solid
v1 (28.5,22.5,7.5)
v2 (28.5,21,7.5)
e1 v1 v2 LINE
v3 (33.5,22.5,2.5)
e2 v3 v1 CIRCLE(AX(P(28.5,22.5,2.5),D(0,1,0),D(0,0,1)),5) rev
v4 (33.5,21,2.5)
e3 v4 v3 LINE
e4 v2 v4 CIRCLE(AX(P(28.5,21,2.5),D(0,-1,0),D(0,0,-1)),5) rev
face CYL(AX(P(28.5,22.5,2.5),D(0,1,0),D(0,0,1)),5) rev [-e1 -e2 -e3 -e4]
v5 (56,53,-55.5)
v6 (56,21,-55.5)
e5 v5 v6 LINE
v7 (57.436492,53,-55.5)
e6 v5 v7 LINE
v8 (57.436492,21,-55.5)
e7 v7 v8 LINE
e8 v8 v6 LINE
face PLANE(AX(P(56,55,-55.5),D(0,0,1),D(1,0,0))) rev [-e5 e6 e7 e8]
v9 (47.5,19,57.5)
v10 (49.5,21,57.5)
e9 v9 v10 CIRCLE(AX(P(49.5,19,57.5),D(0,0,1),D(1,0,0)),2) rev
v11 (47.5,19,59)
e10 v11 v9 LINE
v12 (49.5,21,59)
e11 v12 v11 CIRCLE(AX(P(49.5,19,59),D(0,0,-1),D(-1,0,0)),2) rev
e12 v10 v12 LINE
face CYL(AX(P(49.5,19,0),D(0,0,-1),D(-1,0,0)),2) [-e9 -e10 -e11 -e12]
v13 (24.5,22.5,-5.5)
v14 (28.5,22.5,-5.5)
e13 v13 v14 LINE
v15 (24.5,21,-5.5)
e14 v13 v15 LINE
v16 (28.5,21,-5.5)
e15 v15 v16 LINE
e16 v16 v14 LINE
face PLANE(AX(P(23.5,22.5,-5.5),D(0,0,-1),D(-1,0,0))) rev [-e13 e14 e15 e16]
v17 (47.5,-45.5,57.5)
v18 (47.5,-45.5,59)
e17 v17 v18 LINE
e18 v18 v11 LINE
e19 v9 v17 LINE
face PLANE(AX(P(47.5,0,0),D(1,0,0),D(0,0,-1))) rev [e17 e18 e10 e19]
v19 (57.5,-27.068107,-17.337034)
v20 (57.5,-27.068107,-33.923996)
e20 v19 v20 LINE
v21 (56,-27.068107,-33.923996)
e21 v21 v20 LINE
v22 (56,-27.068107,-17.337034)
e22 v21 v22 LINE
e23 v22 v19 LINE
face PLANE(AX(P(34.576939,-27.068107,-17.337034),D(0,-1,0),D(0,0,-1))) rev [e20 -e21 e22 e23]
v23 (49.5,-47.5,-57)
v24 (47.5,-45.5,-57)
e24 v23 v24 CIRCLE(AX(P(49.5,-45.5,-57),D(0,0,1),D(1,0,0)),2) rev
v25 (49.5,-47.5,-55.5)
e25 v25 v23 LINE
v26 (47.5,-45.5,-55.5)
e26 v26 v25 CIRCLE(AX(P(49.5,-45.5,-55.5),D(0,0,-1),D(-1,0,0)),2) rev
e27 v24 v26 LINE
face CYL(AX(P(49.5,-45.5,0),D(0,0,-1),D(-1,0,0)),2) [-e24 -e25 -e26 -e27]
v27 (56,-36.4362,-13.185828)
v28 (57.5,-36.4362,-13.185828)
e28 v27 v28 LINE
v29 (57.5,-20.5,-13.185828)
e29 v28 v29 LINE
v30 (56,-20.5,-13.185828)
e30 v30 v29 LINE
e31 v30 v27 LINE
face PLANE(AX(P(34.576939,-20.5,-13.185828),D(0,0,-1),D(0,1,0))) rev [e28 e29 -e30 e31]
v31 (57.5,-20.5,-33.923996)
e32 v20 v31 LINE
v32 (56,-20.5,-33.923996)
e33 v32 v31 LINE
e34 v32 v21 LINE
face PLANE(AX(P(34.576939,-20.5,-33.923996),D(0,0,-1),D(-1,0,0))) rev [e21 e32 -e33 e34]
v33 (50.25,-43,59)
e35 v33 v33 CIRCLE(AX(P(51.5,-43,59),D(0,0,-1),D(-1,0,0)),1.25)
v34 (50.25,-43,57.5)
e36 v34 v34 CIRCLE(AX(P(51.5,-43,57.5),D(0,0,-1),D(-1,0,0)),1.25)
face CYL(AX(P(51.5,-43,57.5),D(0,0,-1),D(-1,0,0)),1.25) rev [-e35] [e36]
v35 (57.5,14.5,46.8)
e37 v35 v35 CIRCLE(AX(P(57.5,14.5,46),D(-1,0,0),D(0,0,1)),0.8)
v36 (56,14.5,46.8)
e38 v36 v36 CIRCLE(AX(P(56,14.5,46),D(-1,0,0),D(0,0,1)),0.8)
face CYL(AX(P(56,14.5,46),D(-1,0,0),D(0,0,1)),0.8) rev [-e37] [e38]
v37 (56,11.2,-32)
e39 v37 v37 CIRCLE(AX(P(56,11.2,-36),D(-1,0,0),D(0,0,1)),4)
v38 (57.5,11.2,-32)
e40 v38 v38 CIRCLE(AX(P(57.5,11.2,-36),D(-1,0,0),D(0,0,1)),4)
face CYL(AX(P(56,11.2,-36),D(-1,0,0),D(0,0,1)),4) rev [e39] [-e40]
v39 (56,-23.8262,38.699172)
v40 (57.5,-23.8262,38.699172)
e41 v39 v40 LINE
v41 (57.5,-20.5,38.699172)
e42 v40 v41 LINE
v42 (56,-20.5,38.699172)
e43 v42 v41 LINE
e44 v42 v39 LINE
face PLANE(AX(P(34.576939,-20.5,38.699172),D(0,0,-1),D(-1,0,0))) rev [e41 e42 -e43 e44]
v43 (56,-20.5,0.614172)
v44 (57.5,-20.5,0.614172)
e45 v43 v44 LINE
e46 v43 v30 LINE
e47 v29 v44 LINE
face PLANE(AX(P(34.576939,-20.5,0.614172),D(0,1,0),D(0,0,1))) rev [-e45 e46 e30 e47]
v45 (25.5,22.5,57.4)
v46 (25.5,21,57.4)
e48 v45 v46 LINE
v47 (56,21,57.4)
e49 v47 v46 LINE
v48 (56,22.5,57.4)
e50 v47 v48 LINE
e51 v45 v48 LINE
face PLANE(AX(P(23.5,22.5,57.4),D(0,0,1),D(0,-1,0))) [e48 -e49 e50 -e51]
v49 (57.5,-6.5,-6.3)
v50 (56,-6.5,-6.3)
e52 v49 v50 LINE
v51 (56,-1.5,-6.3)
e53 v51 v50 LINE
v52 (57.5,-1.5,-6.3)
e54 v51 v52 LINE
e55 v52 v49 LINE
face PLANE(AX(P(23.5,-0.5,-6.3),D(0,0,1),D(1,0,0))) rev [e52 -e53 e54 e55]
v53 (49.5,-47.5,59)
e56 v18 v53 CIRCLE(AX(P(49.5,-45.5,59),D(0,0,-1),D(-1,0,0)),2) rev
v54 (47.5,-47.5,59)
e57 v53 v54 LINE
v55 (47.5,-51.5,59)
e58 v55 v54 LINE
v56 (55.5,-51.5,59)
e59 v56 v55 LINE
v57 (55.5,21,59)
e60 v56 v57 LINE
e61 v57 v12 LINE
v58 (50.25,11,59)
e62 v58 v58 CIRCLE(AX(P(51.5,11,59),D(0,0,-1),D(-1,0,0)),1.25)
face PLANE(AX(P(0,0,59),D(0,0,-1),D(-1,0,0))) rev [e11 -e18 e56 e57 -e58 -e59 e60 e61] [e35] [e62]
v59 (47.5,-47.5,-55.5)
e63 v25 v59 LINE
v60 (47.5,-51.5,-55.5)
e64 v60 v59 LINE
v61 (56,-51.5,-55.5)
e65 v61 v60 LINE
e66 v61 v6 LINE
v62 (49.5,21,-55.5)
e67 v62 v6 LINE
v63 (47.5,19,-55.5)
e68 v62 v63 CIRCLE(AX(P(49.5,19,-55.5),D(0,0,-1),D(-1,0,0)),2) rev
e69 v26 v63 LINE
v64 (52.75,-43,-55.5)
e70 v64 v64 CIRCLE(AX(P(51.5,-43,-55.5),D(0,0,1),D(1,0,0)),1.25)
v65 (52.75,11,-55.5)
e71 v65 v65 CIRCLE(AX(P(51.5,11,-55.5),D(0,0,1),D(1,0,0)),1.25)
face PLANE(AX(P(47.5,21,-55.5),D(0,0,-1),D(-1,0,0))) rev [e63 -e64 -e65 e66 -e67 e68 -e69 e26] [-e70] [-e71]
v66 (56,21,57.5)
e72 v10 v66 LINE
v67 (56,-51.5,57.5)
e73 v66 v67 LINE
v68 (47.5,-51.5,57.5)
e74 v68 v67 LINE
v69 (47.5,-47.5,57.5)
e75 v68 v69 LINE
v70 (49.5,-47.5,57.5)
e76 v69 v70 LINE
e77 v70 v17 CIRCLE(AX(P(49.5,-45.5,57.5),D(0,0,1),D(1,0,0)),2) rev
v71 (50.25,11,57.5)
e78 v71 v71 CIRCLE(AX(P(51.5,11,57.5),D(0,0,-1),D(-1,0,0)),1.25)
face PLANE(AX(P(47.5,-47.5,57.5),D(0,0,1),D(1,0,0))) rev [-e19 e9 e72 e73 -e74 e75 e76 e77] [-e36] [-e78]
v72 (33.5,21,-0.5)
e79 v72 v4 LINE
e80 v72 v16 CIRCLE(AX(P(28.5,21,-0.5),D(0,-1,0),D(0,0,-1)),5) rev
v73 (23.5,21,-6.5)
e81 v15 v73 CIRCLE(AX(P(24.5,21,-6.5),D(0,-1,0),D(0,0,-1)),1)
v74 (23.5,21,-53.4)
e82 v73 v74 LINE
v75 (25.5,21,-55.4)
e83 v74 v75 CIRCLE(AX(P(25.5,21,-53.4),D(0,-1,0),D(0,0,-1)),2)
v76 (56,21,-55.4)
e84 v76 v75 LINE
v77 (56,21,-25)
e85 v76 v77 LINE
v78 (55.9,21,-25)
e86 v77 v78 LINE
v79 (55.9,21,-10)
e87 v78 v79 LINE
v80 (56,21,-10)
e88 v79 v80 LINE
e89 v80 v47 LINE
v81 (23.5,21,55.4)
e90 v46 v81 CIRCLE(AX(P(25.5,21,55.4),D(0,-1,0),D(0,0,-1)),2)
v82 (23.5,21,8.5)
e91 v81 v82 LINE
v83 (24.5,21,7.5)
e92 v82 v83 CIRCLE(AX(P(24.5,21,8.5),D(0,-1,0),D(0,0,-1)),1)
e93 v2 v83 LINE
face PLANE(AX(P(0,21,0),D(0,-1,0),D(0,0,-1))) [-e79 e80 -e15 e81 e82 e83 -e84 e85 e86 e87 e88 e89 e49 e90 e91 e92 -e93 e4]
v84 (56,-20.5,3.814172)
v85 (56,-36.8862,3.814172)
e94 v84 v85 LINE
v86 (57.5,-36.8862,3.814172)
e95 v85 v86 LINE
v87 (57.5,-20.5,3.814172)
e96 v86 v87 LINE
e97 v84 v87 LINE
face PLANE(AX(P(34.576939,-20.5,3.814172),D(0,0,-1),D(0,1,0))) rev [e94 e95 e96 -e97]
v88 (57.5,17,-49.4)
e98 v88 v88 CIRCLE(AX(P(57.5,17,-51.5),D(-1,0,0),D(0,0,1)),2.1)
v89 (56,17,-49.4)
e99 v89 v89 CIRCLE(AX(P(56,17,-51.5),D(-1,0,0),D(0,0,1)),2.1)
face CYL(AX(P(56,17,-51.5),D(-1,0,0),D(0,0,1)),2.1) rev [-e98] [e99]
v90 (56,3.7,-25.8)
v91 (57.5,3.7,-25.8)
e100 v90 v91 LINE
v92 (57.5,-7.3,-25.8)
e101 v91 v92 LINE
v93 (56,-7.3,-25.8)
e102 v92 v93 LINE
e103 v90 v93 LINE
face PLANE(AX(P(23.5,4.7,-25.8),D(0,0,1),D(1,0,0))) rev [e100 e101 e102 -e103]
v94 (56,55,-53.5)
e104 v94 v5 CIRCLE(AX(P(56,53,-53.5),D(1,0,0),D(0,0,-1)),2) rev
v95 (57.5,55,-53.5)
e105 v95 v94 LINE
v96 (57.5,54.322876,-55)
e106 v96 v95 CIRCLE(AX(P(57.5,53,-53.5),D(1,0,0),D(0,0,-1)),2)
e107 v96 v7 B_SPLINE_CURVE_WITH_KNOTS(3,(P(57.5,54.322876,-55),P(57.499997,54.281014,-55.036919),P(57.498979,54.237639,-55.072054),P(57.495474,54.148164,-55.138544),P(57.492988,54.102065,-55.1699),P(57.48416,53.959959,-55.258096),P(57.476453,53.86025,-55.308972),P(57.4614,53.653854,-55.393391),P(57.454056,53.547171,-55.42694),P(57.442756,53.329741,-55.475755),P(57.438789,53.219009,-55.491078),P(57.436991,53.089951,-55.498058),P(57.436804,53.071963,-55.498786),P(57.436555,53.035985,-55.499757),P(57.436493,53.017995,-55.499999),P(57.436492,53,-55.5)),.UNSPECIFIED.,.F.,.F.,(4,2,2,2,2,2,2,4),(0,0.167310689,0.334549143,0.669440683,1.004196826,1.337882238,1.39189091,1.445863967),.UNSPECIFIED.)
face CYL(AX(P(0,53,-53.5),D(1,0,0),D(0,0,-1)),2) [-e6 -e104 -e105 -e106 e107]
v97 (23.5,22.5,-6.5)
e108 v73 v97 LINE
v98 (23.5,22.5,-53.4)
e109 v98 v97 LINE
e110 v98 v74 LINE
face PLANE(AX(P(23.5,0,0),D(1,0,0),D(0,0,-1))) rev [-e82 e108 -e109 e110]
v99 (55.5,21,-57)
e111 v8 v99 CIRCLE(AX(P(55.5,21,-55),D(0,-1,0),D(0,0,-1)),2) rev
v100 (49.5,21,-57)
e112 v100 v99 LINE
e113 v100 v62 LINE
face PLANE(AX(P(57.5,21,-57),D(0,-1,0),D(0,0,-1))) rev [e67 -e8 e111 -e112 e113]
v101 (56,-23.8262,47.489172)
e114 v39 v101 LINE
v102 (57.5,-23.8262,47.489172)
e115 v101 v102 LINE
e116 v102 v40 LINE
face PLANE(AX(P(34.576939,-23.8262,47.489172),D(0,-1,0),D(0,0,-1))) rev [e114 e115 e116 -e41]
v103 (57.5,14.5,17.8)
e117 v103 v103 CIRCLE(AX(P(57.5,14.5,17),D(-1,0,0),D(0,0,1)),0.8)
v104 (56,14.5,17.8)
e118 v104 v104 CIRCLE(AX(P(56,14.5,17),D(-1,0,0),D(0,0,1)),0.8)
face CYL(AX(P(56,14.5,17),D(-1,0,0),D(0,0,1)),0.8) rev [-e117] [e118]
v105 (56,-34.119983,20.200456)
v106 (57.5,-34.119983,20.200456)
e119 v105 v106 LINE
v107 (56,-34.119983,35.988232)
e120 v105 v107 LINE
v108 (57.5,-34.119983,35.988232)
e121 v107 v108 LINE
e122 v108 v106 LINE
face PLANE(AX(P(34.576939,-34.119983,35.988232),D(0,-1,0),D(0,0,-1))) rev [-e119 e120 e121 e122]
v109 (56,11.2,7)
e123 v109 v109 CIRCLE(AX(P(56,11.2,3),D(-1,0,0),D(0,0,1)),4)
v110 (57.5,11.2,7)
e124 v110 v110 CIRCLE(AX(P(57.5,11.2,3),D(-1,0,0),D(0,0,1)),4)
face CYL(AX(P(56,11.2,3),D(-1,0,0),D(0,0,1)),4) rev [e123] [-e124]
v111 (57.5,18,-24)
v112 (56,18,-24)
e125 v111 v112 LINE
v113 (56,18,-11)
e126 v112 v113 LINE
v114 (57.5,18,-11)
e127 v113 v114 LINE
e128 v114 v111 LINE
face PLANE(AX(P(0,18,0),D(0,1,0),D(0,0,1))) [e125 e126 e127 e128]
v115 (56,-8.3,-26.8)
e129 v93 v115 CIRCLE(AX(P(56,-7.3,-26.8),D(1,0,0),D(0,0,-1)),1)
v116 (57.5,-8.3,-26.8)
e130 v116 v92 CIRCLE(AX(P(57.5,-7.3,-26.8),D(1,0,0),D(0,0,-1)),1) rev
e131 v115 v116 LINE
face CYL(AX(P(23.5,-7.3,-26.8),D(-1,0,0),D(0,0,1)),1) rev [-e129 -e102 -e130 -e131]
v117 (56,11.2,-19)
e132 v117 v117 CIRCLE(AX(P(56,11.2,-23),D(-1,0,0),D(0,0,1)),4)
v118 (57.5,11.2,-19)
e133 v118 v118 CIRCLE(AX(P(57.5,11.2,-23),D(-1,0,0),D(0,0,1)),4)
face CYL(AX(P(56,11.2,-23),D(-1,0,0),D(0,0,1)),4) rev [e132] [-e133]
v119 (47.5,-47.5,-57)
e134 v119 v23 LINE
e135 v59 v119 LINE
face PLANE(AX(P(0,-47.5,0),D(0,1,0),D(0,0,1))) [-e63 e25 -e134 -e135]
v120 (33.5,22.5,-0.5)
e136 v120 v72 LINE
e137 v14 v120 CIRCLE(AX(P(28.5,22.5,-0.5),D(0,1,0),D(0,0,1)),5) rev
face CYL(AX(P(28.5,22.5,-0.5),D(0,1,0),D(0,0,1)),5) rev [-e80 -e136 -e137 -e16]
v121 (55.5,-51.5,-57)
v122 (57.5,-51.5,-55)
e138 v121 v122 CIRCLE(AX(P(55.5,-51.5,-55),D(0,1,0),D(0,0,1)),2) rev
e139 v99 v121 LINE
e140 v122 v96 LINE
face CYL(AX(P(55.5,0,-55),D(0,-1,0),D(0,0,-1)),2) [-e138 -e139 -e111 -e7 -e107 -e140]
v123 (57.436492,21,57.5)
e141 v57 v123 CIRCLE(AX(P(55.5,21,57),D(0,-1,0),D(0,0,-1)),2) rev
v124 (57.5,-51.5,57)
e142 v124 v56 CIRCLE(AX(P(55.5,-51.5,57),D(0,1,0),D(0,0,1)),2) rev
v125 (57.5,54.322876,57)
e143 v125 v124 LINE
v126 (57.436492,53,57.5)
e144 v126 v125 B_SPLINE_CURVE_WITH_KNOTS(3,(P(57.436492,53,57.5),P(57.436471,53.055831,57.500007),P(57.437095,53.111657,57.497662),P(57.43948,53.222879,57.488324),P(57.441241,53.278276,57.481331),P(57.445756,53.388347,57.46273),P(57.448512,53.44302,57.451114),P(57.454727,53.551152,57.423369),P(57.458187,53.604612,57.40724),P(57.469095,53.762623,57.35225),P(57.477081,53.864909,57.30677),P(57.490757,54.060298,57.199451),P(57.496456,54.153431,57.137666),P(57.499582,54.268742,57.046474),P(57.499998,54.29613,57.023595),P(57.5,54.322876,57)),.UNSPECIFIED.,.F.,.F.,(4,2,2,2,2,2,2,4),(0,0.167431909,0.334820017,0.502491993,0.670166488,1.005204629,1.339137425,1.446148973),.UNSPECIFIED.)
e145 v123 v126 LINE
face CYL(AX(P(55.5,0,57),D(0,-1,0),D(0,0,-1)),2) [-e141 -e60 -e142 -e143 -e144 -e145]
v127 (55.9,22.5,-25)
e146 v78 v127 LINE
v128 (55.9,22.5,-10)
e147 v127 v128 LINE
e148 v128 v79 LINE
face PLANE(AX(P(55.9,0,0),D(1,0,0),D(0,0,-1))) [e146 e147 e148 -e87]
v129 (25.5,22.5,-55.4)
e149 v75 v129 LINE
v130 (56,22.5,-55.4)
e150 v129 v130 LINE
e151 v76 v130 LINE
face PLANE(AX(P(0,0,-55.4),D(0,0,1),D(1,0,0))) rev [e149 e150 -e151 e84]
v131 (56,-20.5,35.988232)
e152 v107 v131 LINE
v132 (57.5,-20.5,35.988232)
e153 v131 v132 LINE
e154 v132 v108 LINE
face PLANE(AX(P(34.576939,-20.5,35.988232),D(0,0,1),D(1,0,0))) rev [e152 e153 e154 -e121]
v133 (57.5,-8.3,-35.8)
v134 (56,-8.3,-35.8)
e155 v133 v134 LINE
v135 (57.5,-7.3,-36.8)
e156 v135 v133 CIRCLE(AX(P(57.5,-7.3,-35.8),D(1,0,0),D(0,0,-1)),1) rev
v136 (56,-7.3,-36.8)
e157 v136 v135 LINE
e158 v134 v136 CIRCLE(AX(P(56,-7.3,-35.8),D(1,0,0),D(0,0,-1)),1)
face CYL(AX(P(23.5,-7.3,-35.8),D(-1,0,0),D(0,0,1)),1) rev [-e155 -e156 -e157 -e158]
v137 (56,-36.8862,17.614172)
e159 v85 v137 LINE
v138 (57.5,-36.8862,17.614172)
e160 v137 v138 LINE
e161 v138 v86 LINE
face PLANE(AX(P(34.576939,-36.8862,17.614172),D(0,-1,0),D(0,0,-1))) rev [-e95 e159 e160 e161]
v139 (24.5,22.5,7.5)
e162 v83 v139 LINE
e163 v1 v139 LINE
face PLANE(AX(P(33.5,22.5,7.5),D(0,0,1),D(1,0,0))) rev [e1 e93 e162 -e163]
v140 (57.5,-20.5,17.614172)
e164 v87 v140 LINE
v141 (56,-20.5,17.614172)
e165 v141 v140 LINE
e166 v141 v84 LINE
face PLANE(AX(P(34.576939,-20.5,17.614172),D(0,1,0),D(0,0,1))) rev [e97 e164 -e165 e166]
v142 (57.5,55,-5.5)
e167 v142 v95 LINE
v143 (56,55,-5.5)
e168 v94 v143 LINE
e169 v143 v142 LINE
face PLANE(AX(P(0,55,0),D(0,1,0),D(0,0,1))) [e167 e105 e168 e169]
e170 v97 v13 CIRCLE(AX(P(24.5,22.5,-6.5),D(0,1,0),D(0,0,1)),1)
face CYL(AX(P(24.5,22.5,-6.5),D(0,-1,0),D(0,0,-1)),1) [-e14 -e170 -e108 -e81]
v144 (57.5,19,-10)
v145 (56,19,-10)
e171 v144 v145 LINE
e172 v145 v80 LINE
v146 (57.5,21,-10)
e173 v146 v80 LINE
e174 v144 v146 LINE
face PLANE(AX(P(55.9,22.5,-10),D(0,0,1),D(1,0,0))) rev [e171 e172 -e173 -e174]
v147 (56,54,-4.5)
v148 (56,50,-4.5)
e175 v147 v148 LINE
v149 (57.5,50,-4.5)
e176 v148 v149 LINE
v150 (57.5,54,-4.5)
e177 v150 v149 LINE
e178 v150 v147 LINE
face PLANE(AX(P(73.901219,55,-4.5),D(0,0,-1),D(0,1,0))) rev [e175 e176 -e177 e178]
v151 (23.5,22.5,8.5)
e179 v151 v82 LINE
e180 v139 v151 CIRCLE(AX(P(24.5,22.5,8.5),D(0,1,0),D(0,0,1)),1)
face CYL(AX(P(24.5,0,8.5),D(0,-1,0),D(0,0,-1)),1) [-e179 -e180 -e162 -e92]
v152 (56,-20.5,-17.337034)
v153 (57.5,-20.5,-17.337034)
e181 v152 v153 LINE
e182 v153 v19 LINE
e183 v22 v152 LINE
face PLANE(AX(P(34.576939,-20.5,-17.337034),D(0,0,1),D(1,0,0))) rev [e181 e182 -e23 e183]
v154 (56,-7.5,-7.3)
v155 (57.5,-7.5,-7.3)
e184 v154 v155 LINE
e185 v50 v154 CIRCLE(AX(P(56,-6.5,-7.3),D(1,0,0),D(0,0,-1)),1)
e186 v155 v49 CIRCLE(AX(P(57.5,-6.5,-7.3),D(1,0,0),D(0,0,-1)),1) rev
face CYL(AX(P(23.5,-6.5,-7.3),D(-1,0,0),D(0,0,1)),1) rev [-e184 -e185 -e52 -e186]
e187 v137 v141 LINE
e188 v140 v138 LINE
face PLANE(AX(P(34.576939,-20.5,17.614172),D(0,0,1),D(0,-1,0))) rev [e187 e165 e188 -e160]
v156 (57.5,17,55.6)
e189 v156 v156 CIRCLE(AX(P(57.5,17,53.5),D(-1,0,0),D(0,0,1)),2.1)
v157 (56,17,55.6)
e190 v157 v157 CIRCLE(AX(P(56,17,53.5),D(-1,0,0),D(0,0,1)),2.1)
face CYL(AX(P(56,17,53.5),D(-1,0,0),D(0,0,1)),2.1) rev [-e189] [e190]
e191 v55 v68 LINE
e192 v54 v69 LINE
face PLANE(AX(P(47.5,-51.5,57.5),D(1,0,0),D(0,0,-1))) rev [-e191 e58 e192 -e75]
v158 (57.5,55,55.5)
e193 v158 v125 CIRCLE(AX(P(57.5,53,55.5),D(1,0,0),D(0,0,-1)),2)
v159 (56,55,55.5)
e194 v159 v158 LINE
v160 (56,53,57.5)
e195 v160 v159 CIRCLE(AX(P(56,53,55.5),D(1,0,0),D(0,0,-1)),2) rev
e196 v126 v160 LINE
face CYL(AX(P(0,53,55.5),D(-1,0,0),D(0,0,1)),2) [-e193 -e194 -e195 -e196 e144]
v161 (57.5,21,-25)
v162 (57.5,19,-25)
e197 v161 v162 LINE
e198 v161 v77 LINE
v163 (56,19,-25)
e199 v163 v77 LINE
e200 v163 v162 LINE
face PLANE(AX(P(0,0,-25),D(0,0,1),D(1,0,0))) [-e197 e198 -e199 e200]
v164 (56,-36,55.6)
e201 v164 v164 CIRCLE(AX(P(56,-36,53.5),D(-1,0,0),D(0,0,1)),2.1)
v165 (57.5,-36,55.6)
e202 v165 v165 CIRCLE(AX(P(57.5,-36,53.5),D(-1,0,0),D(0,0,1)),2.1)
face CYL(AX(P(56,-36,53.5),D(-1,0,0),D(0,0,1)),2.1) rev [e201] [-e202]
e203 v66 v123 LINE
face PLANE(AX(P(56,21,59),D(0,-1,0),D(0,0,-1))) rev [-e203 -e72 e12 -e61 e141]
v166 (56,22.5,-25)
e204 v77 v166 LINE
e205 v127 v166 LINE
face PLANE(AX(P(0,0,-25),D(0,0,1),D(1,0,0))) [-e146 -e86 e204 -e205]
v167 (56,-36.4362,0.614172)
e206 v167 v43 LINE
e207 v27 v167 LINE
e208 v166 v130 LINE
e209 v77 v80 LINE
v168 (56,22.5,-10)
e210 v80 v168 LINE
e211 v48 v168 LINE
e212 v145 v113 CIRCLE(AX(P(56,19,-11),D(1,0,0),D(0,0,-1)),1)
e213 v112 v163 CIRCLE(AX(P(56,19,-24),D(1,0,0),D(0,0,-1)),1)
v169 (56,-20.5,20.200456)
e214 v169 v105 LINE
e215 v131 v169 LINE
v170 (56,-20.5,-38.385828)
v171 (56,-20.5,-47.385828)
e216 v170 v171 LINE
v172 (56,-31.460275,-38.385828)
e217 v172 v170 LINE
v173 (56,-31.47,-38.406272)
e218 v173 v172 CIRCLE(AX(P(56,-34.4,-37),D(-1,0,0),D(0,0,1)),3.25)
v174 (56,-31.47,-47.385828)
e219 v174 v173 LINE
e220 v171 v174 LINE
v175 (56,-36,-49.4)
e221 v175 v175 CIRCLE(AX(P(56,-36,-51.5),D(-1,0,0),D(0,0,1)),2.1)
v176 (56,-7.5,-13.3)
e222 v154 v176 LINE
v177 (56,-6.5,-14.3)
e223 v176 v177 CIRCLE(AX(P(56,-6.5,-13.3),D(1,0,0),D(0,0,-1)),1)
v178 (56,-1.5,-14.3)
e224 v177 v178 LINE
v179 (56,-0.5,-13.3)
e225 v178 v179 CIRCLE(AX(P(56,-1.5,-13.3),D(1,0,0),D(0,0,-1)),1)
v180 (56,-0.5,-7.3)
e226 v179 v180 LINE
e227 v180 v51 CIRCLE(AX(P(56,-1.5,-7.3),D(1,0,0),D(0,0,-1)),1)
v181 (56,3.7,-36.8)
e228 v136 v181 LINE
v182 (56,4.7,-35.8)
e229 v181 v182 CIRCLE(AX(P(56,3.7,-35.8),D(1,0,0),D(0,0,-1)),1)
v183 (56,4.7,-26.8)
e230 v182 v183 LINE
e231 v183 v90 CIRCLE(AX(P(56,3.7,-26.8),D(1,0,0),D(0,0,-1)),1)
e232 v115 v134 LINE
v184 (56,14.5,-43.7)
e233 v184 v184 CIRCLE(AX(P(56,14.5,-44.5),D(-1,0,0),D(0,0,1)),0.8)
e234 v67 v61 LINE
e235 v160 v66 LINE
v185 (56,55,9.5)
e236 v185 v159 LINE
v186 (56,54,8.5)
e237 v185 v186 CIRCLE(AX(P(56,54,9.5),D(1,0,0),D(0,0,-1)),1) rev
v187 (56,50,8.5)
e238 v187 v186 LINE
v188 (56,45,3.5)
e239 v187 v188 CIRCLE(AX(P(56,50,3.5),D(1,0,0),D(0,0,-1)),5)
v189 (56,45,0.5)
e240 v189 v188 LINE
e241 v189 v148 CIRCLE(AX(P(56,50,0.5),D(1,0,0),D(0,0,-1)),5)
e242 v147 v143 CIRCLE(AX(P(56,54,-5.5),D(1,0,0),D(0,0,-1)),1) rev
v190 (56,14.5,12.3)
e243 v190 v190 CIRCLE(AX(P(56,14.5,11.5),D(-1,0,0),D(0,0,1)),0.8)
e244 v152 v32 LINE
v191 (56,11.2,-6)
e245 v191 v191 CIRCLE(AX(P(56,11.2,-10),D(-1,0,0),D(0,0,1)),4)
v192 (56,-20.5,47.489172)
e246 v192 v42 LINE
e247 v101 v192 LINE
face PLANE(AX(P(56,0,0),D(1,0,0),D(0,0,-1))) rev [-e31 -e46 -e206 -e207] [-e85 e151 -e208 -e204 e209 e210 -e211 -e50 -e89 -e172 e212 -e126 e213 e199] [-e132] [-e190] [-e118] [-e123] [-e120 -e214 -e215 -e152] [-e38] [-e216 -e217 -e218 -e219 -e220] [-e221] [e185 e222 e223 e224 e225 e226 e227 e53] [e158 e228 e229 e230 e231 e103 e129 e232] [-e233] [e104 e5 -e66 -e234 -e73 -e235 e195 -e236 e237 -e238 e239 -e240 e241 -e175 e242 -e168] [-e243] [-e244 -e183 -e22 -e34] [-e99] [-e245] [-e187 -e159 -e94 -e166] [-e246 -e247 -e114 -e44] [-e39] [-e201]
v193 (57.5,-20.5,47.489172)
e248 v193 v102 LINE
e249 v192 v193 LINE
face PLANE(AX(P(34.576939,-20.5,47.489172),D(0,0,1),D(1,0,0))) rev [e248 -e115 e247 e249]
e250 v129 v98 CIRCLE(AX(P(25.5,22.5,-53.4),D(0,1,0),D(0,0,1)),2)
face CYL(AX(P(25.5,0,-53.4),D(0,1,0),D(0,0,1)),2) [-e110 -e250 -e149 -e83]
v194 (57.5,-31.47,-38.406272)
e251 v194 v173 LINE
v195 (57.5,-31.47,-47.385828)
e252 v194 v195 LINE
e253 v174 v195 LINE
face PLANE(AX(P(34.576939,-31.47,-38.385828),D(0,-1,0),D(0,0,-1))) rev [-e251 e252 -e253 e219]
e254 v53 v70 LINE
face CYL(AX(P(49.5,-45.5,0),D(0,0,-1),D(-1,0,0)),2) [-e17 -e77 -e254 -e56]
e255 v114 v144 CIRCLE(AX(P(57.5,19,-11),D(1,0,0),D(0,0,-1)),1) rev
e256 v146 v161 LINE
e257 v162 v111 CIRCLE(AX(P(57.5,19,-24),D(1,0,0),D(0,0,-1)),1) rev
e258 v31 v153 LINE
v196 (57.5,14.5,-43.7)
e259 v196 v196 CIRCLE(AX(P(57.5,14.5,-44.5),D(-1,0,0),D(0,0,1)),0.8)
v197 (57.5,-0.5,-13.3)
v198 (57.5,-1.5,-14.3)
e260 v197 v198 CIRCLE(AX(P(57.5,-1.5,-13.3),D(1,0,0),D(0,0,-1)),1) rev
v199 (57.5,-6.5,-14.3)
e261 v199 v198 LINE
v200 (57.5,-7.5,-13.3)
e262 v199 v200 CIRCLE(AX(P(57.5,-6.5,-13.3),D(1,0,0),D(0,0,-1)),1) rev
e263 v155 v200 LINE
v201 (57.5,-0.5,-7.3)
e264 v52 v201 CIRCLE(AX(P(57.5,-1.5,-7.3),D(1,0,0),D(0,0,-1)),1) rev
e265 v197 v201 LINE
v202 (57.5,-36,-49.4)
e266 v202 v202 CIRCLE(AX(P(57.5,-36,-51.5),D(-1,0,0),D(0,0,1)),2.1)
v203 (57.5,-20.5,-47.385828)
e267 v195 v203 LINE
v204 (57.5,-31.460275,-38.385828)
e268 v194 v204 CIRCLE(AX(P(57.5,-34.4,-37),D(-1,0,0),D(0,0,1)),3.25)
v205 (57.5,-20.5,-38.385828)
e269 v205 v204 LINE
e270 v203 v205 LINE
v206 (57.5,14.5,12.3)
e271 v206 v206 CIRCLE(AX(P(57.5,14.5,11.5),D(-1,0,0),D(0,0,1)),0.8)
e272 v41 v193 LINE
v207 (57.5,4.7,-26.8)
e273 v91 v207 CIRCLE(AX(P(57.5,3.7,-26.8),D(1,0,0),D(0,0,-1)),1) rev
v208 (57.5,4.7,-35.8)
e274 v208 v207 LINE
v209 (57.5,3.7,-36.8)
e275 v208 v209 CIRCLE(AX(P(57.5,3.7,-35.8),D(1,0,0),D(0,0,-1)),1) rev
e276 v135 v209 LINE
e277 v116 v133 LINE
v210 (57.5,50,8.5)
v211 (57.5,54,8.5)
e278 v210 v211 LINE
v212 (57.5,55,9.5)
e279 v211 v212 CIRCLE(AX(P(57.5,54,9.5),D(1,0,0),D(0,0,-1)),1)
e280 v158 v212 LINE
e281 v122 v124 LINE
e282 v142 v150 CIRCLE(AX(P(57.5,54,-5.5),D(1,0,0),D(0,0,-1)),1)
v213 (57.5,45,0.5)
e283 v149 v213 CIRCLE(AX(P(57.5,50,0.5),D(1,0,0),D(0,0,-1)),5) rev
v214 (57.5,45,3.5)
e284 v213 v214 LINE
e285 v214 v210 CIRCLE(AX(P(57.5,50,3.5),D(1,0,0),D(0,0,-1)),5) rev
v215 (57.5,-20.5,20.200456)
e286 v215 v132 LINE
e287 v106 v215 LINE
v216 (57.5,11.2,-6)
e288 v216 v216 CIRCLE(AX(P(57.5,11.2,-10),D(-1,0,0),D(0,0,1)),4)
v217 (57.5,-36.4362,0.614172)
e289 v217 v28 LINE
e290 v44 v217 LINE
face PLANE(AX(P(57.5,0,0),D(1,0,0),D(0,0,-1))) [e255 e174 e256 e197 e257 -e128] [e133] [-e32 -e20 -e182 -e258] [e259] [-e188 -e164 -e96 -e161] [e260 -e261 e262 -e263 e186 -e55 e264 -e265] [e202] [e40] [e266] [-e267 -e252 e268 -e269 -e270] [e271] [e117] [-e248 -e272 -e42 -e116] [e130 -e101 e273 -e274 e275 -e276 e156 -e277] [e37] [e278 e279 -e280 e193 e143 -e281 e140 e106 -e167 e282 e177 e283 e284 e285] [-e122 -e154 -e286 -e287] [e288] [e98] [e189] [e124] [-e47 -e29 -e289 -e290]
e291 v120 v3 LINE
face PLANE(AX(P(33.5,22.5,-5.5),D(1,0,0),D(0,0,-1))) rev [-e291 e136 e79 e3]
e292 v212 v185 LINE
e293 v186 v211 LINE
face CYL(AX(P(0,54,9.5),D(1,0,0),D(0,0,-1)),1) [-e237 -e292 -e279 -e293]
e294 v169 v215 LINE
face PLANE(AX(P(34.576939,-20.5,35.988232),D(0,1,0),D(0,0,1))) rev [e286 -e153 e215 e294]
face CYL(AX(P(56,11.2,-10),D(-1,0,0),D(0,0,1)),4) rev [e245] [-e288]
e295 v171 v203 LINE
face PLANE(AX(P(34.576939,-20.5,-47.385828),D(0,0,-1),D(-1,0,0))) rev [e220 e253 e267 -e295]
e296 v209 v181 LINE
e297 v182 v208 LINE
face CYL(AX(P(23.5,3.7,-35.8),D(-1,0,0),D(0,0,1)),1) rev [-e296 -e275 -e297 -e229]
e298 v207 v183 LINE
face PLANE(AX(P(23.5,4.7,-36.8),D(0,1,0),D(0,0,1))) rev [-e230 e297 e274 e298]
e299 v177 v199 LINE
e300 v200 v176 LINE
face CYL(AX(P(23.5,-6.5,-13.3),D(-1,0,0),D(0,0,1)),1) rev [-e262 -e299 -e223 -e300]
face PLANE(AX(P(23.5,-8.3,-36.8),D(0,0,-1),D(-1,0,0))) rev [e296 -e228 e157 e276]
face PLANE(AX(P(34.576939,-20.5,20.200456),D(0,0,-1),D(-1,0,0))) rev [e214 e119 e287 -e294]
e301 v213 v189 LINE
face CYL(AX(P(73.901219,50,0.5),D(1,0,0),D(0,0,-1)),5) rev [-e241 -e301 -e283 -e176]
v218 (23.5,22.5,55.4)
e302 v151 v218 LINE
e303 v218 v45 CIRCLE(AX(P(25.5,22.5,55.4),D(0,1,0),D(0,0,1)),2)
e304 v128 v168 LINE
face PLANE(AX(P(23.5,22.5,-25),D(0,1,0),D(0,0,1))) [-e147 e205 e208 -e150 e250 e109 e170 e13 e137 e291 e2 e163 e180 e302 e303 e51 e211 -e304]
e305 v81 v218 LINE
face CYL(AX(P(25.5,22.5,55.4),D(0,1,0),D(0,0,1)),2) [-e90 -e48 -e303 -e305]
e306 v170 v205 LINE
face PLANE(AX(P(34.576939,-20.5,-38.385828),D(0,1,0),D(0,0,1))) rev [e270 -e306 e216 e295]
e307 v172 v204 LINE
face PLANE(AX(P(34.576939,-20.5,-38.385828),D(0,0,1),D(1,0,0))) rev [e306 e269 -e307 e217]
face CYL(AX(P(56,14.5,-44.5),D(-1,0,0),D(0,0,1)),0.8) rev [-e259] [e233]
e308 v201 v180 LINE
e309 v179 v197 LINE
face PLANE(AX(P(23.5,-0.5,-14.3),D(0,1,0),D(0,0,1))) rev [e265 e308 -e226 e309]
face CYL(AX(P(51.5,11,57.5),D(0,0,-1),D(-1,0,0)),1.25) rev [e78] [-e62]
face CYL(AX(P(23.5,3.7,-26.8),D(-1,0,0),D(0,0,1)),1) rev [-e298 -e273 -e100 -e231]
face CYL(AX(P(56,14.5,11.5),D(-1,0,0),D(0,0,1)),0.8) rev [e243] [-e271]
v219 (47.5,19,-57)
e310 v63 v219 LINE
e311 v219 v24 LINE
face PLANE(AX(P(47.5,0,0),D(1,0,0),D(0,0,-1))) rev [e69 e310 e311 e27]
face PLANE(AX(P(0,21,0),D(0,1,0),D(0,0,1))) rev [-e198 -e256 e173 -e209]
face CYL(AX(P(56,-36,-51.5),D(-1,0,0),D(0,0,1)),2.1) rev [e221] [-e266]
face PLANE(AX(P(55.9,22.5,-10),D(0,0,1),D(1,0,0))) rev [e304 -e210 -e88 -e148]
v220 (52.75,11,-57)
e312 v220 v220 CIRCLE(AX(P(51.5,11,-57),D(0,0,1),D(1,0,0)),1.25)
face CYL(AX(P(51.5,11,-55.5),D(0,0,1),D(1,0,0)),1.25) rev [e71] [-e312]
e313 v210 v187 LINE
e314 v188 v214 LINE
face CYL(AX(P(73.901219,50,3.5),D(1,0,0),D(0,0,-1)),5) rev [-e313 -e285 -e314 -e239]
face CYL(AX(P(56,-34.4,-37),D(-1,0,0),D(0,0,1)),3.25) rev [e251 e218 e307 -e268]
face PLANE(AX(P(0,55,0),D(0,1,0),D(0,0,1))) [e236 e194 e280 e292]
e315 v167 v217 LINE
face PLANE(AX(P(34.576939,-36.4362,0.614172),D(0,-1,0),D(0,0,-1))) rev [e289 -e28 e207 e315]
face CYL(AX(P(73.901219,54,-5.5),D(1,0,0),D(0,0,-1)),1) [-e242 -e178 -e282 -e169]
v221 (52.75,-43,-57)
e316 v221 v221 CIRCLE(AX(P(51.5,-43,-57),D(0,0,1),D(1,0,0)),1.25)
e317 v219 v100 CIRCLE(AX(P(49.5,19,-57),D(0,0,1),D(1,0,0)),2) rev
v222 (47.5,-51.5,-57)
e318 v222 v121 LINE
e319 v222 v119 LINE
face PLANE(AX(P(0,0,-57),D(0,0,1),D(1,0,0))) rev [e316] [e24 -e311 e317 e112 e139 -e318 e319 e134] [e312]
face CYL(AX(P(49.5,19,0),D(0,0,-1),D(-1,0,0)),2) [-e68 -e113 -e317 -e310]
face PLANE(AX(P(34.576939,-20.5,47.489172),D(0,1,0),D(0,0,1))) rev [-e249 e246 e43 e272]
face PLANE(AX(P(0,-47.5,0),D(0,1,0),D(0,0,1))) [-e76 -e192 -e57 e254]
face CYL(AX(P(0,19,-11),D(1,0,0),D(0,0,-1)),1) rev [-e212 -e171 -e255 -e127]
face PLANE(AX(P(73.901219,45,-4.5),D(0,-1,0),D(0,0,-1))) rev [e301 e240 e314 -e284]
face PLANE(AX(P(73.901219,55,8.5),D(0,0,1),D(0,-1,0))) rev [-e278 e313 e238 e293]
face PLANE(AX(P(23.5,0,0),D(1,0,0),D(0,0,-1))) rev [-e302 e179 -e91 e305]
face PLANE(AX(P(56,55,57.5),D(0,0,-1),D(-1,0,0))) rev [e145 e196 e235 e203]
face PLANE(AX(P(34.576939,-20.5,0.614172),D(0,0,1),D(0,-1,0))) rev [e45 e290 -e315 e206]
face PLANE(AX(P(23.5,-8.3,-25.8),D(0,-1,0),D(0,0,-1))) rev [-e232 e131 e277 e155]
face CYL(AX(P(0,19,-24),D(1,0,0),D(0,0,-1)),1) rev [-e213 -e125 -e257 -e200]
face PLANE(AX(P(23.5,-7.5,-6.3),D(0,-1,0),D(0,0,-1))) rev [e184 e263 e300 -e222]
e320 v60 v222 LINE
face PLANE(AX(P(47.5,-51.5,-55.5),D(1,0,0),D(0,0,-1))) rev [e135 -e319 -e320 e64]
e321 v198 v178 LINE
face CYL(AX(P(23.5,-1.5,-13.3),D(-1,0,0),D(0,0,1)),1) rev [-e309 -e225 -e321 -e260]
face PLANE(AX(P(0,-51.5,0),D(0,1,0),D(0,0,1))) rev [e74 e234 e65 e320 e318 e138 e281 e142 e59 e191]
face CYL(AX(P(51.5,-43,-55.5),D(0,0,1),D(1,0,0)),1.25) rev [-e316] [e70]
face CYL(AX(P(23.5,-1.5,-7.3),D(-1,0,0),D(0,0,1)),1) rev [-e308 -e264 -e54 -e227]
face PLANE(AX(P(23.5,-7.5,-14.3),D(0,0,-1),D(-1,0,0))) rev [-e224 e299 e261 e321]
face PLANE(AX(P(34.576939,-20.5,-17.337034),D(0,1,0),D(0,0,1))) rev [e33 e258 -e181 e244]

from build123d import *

# Parameters (mm, degrees)
CROQUIS1_W                          = 82.4
CROQUIS1_H                          = 70
SALIENTE_EXTRUIR1_DEPTH             = 34
CROQUIS2_W                          = 15
CROQUIS2_H                          = 70
CORTAR_EXTRUIR1_DEPTH               = 0.1
CROQUIS3_W                          = 1.5
CROQUIS3_H                          = 15
CORTAR_EXTRUIR2_DEPTH               = 1.5
CORTAR_EXTRUIR3_DEPTH               = 68.5
CROQUIS5_W                          = 1.5
CROQUIS5_H                          = 15
CORTAR_EXTRUIR4_DEPTH               = 3
SALIENTE_EXTRUIR2_DEPTH             = 30.4
CROQUIS7_W                          = 1.5
CROQUIS7_H                          = 68.5
SALIENTE_EXTRUIR3_DEPTH             = 1.6
CROQUIS8_W                          = 1.5
CROQUIS8_H                          = 68.5
SALIENTE_EXTRUIR4_DEPTH             = 8.5
CROQUIS9_W                          = 1.5
CROQUIS9_H                          = 68.5
SALIENTE_EXTRUIR5_DEPTH             = 1.6
CROQUIS10_W                         = 1.5
CROQUIS10_H                         = 68.5
SALIENTE_EXTRUIR6_DEPTH             = 8.5
CROQUIS11_W                         = 10
CROQUIS11_H                         = 13
CORTAR_EXTRUIR5_DEPTH               = 108.142428571
CROQUIS12_W                         = 8
CROQUIS12_H                         = 7
CORTAR_EXTRUIR6_DEPTH               = 84.025598462
CROQUIS13_W                         = 11
CROQUIS13_H                         = 13
CORTAR_EXTRUIR7_DEPTH               = 84.025598462
CORTAR_EXTRUIR8_DEPTH               = 84.025598462
CROQUIS15_W                         = 13.55
CROQUIS15_H                         = 6
CORTAR_EXTRUIR9_DEPTH               = 84.025598462
CROQUIS16_W                         = 13.55
CROQUIS16_H                         = 6
CORTAR_EXTRUIR10_DEPTH              = 84.025598462
CORTAR_EXTRUIR11_DEPTH              = 84.025598462
CROQUIS18_W                         = 26.5
CROQUIS18_H                         = 6.5
CORTAR_EXTRUIR12_DEPTH              = 84.025598462
CROQUIS19_W                         = 26.5
CROQUIS19_H                         = 6.5
CORTAR_EXTRUIR13_DEPTH              = 84.025598462
CORTAR_EXTRUIR14_DEPTH              = 83.42269105
DI_METRO_DE_TALADRO_8_0_8_1_D       = 8
DI_METRO_DE_TALADRO_6_5_6_5_1_D     = 6.5
DI_METRO_DE_TALADRO_2_5_2_5_1_D     = 2.5
DI_METRO_DE_TALADRO_2_5_2_5_1_DEPTH = 1.5
DI_METRO_DE_TALADRO_2_5_2_5_2_D     = 2.5
DI_METRO_DE_TALADRO_4_2_4_2_1_D     = 4.2
DI_METRO_DE_TALADRO_1_6_1_6_1_D     = 1.6
REDONDEO1_R                         = 0.3
REDONDEO2_R                         = 0.6
REDONDEO3_R                         = 0.8
REDONDEO4_R                         = 1
REDONDEO5_R                         = 1.5
REDONDEO6_R                         = 2
REDONDEO7_R                         = 5
SALIENTE_EXTRUIR7_DEPTH             = 4
CROQUIS38_W                         = 73.889858769
CROQUIS38_H                         = 28.929758263
SALIENTE_EXTRUIR8_DEPTH             = 1.5
CROQUIS39_W                         = 8.790000004
CROQUIS39_H                         = 3.326200024
CROQUIS39_W_2                       = 15.787775455
CROQUIS39_H_2                       = 13.619982862
CROQUIS39_W_3                       = 13.8
CROQUIS39_H_3                       = 16.3862
CROQUIS39_H_4                       = 15.9362
CROQUIS39_W_4                       = 16.586962118
CROQUIS39_H_5                       = 6.568107071
CROQUIS39_W_5                       = 9
CROQUIS39_H_6                       = 10.97
CORTAR_EXTRUIR15_DEPTH              = 1.5
CROQUIS45_W                         = 1.5
CROQUIS45_H                         = 113
SALIENTE_EXTRUIR9_DEPTH             = 34
REDONDEO8_R                         = 2
CROQUIS46_W                         = 13
CROQUIS46_H                         = 10
CORTAR_EXTRUIR16_DEPTH              = 1.5
REDONDEO9_R                         = 1
REDONDEO10_R                        = 5
REDONDEO11_START                    = -52
REDONDEO11_DEPTH                    = 107


with BuildPart() as part:
    # Croquis1 → Saliente-Extruir1 (new body)
    with BuildSketch(Plane(origin=(57.5, 0, 0), x_dir=(0, 0, -1), z_dir=(1, 0, 0))):
        with Locations((-16.2, -12.5)):
            Rectangle(CROQUIS1_W, CROQUIS1_H)
    extrude(amount=-SALIENTE_EXTRUIR1_DEPTH)

    # Croquis2 → Cortar-Extruir1 (cut)
    with BuildSketch(Plane(origin=(56, 0, 0), x_dir=(0, 0, -1), z_dir=(1, 0, 0))):
        with Locations((17.5, -12.5)):
            Rectangle(CROQUIS2_W, CROQUIS2_H)
    extrude(amount=-CORTAR_EXTRUIR1_DEPTH, mode=Mode.SUBTRACT)

    # Croquis3 → Cortar-Extruir2 (cut)
    with BuildSketch(Plane(origin=(0, 22.5, 0), x_dir=(-1, 0, 0), z_dir=(0, 1, 0))):
        with Locations((-56.75, -17.5)):
            Rectangle(CROQUIS3_W, CROQUIS3_H)
    extrude(amount=-CORTAR_EXTRUIR2_DEPTH, mode=Mode.SUBTRACT)

    # Croquis4 → Cortar-Extruir3 (cut)
    with BuildSketch(Plane.XZ.offset(47.5)):
        Polygon((23.5, -25), (55.9, -25), (55.9, -10), (56, -10), (56, 57.4), (23.5, 57.4), align=None)
    extrude(amount=-CORTAR_EXTRUIR3_DEPTH, mode=Mode.SUBTRACT)

    # Croquis5 → Cortar-Extruir4 (cut)
    with BuildSketch(Plane(origin=(0, 21, 0), x_dir=(-1, 0, 0), z_dir=(0, 1, 0))):
        with Locations((-56.75, -17.5)):
            Rectangle(CROQUIS5_W, CROQUIS5_H)
    extrude(amount=-CORTAR_EXTRUIR4_DEPTH, mode=Mode.SUBTRACT)

    # Croquis6 → Saliente-Extruir2 (add)
    with BuildSketch(Plane(origin=(0, 0, -25), x_dir=(-1, 0, 0), z_dir=(0, 0, -1))):
        Polygon((-57.5, 22.5), (-23.5, 22.5), (-23.5, 21), (-56, 21), (-56, -47.5), (-57.5, -47.5), align=None)
    extrude(amount=SALIENTE_EXTRUIR2_DEPTH)

    # Croquis7 → Saliente-Extruir3 (add)
    with BuildSketch(Plane(origin=(0, 0, -55.4), x_dir=(-1, 0, 0), z_dir=(0, 0, -1))):
        with Locations((-56.75, -13.25)):
            Rectangle(CROQUIS7_W, CROQUIS7_H)
    extrude(amount=SALIENTE_EXTRUIR3_DEPTH)

    # Croquis8 → Saliente-Extruir4 (add)
    with BuildSketch(Plane.ZY.offset(-56)):
        with Locations((-56.25, -13.25)):
            Rectangle(CROQUIS8_W, CROQUIS8_H)
    extrude(amount=SALIENTE_EXTRUIR4_DEPTH)

    # Croquis9 → Saliente-Extruir5 (add)
    with BuildSketch(Plane.XY.offset(57.4)):
        with Locations((56.75, -13.25)):
            Rectangle(CROQUIS9_W, CROQUIS9_H)
    extrude(amount=SALIENTE_EXTRUIR5_DEPTH)

    # Croquis10 → Saliente-Extruir6 (add)
    with BuildSketch(Plane.ZY.offset(-56)):
        with Locations((58.25, -13.25)):
            Rectangle(CROQUIS10_W, CROQUIS10_H)
    extrude(amount=SALIENTE_EXTRUIR6_DEPTH)

    # Croquis11 → Cortar-Extruir5 (cut, through all)
    with BuildSketch(Plane.XZ.offset(-21)):
        with Locations((28.5, 1)):
            Rectangle(CROQUIS11_W, CROQUIS11_H)
    extrude(amount=-CORTAR_EXTRUIR5_DEPTH, mode=Mode.SUBTRACT)

    # Croquis12 → Cortar-Extruir6 (cut, through all)
    with BuildSketch(Plane(origin=(57.5, 0, 0), x_dir=(0, 0, -1), z_dir=(1, 0, 0))):
        with Locations((10.3, -4)):
            Rectangle(CROQUIS12_W, CROQUIS12_H)
    extrude(amount=-CORTAR_EXTRUIR6_DEPTH, mode=Mode.SUBTRACT)

    # Croquis13 → Cortar-Extruir7 (cut, through all)
    with BuildSketch(Plane(origin=(57.5, 0, 0), x_dir=(0, 0, -1), z_dir=(1, 0, 0))):
        with Locations((31.3, -1.8)):
            Rectangle(CROQUIS13_W, CROQUIS13_H)
    extrude(amount=-CORTAR_EXTRUIR7_DEPTH, mode=Mode.SUBTRACT)

    # Croquis14 → Cortar-Extruir8 (cut, through all)
    with BuildSketch(Plane(origin=(57.5, 0, 0), x_dir=(0, 0, -1), z_dir=(1, 0, 0))):
        Polygon((15.700301919, -27.5), (25.899698081, -27.5), (27.125480126, -26.163699024), (28.6, -25.510897439), (28.6, -21.3), (13, -21.3), (13, -25.510897439), (14.474519874, -26.163699024), align=None)
    extrude(amount=-CORTAR_EXTRUIR8_DEPTH, mode=Mode.SUBTRACT)

    # Croquis15 → Cortar-Extruir9 (cut, through all)
    with BuildSketch(Plane(origin=(57.5, 0, 0), x_dir=(0, 0, -1), z_dir=(1, 0, 0))):
        with Locations((-17.1, -20.65)):
            Rectangle(CROQUIS15_W, CROQUIS15_H)
    extrude(amount=-CORTAR_EXTRUIR9_DEPTH, mode=Mode.SUBTRACT)

    # Croquis16 → Cortar-Extruir10 (cut, through all)
    with BuildSketch(Plane(origin=(57.5, 0, 0), x_dir=(0, 0, -1), z_dir=(1, 0, 0))):
        with Locations((-17.1, -29.15)):
            Rectangle(CROQUIS16_W, CROQUIS16_H)
    extrude(amount=-CORTAR_EXTRUIR10_DEPTH, mode=Mode.SUBTRACT)

    # Croquis17 → Cortar-Extruir11 (cut, through all)
    with BuildSketch(Plane(origin=(57.5, 0, 0), x_dir=(0, 0, -1), z_dir=(1, 0, 0))):
        Polygon((-5.75, -31.4), (8.95, -31.4), (8.95, -21.4), (4.1, -21.4), (4.1, -20.2), (-0.9, -20.2), (-0.9, -21.4), (-5.75, -21.4), align=None)
    extrude(amount=-CORTAR_EXTRUIR11_DEPTH, mode=Mode.SUBTRACT)

    # Croquis18 → Cortar-Extruir12 (cut, through all)
    with BuildSketch(Plane(origin=(57.5, 0, 0), x_dir=(0, 0, -1), z_dir=(1, 0, 0))):
        with Locations((-15.25, -38.85)):
            Rectangle(CROQUIS18_W, CROQUIS18_H)
    extrude(amount=-CORTAR_EXTRUIR12_DEPTH, mode=Mode.SUBTRACT)

    # Croquis19 → Cortar-Extruir13 (cut, through all)
    with BuildSketch(Plane(origin=(57.5, 0, 0), x_dir=(0, 0, -1), z_dir=(1, 0, 0))):
        with Locations((13.25, -38.85)):
            Rectangle(CROQUIS19_W, CROQUIS19_H)
    extrude(amount=-CORTAR_EXTRUIR13_DEPTH, mode=Mode.SUBTRACT)

    # Croquis20 → Cortar-Extruir14 (cut, through all)
    with BuildSketch(Plane.ZY.offset(-56)):
        Polygon((35.43492424, -26.5), (36.5, -25.43492424), (36.5, -20.8), (27.9, -20.8), (27.9, -25.43492424), (28.96507576, -26.5), align=None)
    extrude(amount=-CORTAR_EXTRUIR14_DEPTH, mode=Mode.SUBTRACT)

    # Diámetro de taladro Ø8.0 (8)1 (through all)
    with Locations(Plane.ZY.offset(-56)):
        with Locations((-23, 11.2), (3, 11.2), (-36, 11.2), (-10, 11.2)):
            Hole(DI_METRO_DE_TALADRO_8_0_8_1_D / 2)

    # Diámetro de taladro Ø6.5 (6.5)1 (through all)
    with Locations(Plane.ZY.offset(-56)):
        with Locations((-37, -34.4)):
            Hole(DI_METRO_DE_TALADRO_6_5_6_5_1_D / 2)

    # Diámetro de taladro Ø2.5 (2.5)1
    with Locations(Plane(origin=(0, 0, 57.5), x_dir=(-1, 0, 0), z_dir=(0, 0, -1))):
        with Locations((-51.5, -43), (-51.5, 11)):
            Hole(DI_METRO_DE_TALADRO_2_5_2_5_1_D / 2, depth=DI_METRO_DE_TALADRO_2_5_2_5_1_DEPTH)

    # Diámetro de taladro Ø2.5 (2.5)2 (through all)
    with Locations(Plane.XY.offset(-55.5)):
        with Locations((51.5, -43), (51.5, 11)):
            Hole(DI_METRO_DE_TALADRO_2_5_2_5_2_D / 2)

    # Diámetro de taladro Ø4.2 (4.2)1 (through all)
    with Locations(Plane.ZY.offset(-56)):
        with Locations((53.5, 17), (53.5, -36), (-51.5, 17), (-51.5, -36)):
            Hole(DI_METRO_DE_TALADRO_4_2_4_2_1_D / 2)

    # Diámetro de taladro Ø1.6 (1.6)1 (through all)
    with Locations(Plane.ZY.offset(-56)):
        with Locations((11.5, 14.5), (-44.5, 14.5), (46, 14.5), (17, 14.5)):
            Hole(DI_METRO_DE_TALADRO_1_6_1_6_1_D / 2)

    # Redondeo1
    redondeo1_edges = [part.edges().sort_by_distance(p)[0] for p in [
        (56.75, -20.2, 0.9),
        (56.75, -20.2, -4.1),
    ]]
    fillet(redondeo1_edges, radius=REDONDEO1_R)

    # Redondeo2
    redondeo2_edges = [part.edges().sort_by_distance(p)[0] for p in [
        (56.75, -23.65, 23.875),
        (56.75, -17.65, 23.875),
        (56.75, -17.65, 10.325),
        (56.75, -23.65, 10.325),
        (56.75, -32.15, 23.875),
        (56.75, -26.15, 23.875),
        (56.75, -26.15, 10.325),
        (56.75, -32.15, 10.325),
    ]]
    fillet(redondeo2_edges, radius=REDONDEO2_R)

    # Redondeo3
    redondeo3_edges = [part.edges().sort_by_distance(p)[0] for p in [
        (56.75, -31.4, 5.75),
        (56.75, -21.4, 5.75),
        (56.75, -21.4, 0.9),
        (56.75, -21.4, -4.1),
        (56.75, -21.4, -8.95),
        (56.75, -31.4, -8.95),
        (56.75, -20.8, 27.9),
        (56.75, -20.8, 36.5),
    ]]
    fillet(redondeo3_edges, radius=REDONDEO3_R)

    # Redondeo4
    redondeo4_edges = [part.edges().sort_by_distance(p)[0] for p in [
        (23.5, 21.75, 7.5),
        (23.5, 21.75, -5.5),
        (56.75, -7.5, -14.3),
        (56.75, -7.5, -6.3),
        (56.75, -0.5, -6.3),
        (56.75, -0.5, -14.3),
        (56.75, 4.7, -36.8),
        (56.75, -8.3, -36.8),
        (56.75, -8.3, -25.8),
        (56.75, 4.7, -25.8),
        (56.75, -27.5, -15.700301919),
        (56.75, -26.163699024, -14.474519874),
        (56.75, -25.510897439, -13),
        (56.75, -21.3, -13),
        (56.75, -21.3, -28.6),
        (56.75, -25.510897439, -28.6),
        (56.75, -26.163699024, -27.125480126),
        (56.75, -27.5, -25.899698081),
        (56.75, -35.6, 28.5),
        (56.75, -35.6, 2),
        (56.75, -42.1, 2),
        (56.75, -42.1, 28.5),
        (56.75, -42.1, 0),
        (56.75, -35.6, 0),
        (56.75, -35.6, -26.5),
        (56.75, -42.1, -26.5),
        (56.75, -26.5, 35.43492424),
        (56.75, -26.5, 28.96507576),
        (56.75, -25.43492424, 27.9),
        (56.75, -25.43492424, 36.5),
        (56.75, 18, -10),
        (56.75, 18, -25),
    ]]
    fillet(redondeo4_edges, radius=REDONDEO4_R)

    # Redondeo5
    redondeo5_edges = [part.edges().sort_by_distance(p)[0] for p in [
        (57.5, -13.25, 59),
        (57.5, -13.25, -57),
        (57.5, 22.5, 23.7),
        (57.5, 22.5, -40.2),
    ]]
    fillet(redondeo5_edges, radius=REDONDEO5_R)

    # Redondeo6
    redondeo6_edges = [part.edges().sort_by_distance(p)[0] for p in [
        (47.5, 21, -56.25),
        (47.5, -47.5, -56.25),
        (47.5, 21, 58.25),
        (47.5, -47.5, 58.25),
        (23.5, 21.75, 57.4),
        (23.5, 21.75, -55.4),
    ]]
    fillet(redondeo6_edges, radius=REDONDEO6_R)

    # Redondeo7
    redondeo7_edges = [part.edges().sort_by_distance(p)[0] for p in [
        (33.5, 21.75, 7.5),
        (33.5, 21.75, -5.5),
    ]]
    fillet(redondeo7_edges, radius=REDONDEO7_R)

    # Croquis33 → Saliente-Extruir7 (add)
    with BuildSketch(Plane.XZ.offset(47.5)):
        Polygon((56, 57.5), (56, -55.5), (47.5, -55.5), (47.5, -57), (57.5, -57), (57.5, -55.5), (57.5, 57.5), (57.5, 59), (47.5, 59), (47.5, 57.5), align=None)
    extrude(amount=SALIENTE_EXTRUIR7_DEPTH)

    # Croquis38 → Saliente-Extruir8 (add)
    with BuildSketch(Plane(origin=(57.5, 0, 0), x_dir=(0, 0, -1), z_dir=(1, 0, 0))):
        with Locations((-4.631874415, -31.532238632)):
            Rectangle(CROQUIS38_W, CROQUIS38_H)
    extrude(amount=-SALIENTE_EXTRUIR8_DEPTH)

    # Croquis39 → Cortar-Extruir15 (cut)
    with BuildSketch(Plane(origin=(57.5, 0, 0), x_dir=(0, 0, -1), z_dir=(1, 0, 0))):
        with Locations((-43.094172143, -22.163100012)):
            Rectangle(CROQUIS39_W, CROQUIS39_H)
        with Locations((-28.094344071, -27.309991431)):
            Rectangle(CROQUIS39_W_2, CROQUIS39_H_2)
        with Locations((-10.714172145, -28.6931)):
            Rectangle(CROQUIS39_W_3, CROQUIS39_H_3)
        with Locations((6.285827855, -28.4681)):
            Rectangle(CROQUIS39_W_3, CROQUIS39_H_4)
        with Locations((25.630515076, -23.784053536)):
            Rectangle(CROQUIS39_W_4, CROQUIS39_H_5)
        with Locations((42.885827855, -25.985)):
            Rectangle(CROQUIS39_W_5, CROQUIS39_H_6)
    extrude(amount=-CORTAR_EXTRUIR15_DEPTH, mode=Mode.SUBTRACT)

    # Croquis45 → Saliente-Extruir9 (add)
    with BuildSketch(Plane(origin=(0, 21, 0), x_dir=(1, 0, 0), z_dir=(0, 1, 0))):
        with Locations((56.75, -1)):
            Rectangle(CROQUIS45_W, CROQUIS45_H)
    extrude(amount=SALIENTE_EXTRUIR9_DEPTH)

    # Redondeo8
    redondeo8_edges = [part.edges().sort_by_distance(p)[0] for p in [
        (56.75, 55, 57.5),
        (56.75, 55, -55.5),
    ]]
    fillet(redondeo8_edges, radius=REDONDEO8_R)

    # Croquis46 → Cortar-Extruir16 (cut)
    with BuildSketch(Plane.ZY.offset(-56)):
        with Locations((2, 50)):
            Rectangle(CROQUIS46_W, CROQUIS46_H)
    extrude(amount=-CORTAR_EXTRUIR16_DEPTH, mode=Mode.SUBTRACT)

    # Redondeo9
    redondeo9_edges = [part.edges().sort_by_distance(p)[0] for p in [
        (56.75, 55, 8.5),
        (56.75, 55, -4.5),
    ]]
    fillet(redondeo9_edges, radius=REDONDEO9_R)

    # Redondeo10
    redondeo10_edges = [part.edges().sort_by_distance(p)[0] for p in [
        (56.75, 45, 8.5),
        (56.75, 45, -4.5),
    ]]
    fillet(redondeo10_edges, radius=REDONDEO10_R)

    # Redondeo11: read off the stored shape, not the designer's step
    # Redondeo11 outline → Redondeo11 (cut)
    with BuildSketch(Plane(origin=(0, 0, 0), x_dir=(1, 0, 0), z_dir=(0, 1, 0)).offset(REDONDEO11_START)):
        with BuildLine():
            ThreePointArc((57.5, -57), (56.914213562, -58.414213562), (55.5, -59))
            Line((55.5, -59), (57.5, -59))
            Line((57.5, -59), (57.5, -57))
        make_face()
        with BuildLine():
            Line((57.5, 55), (57.5, 57))
            Line((57.5, 57), (55.5, 57))
            ThreePointArc((55.5, 57), (56.914213562, 56.414213562), (57.5, 55))
        make_face()
    extrude(amount=REDONDEO11_DEPTH, mode=Mode.SUBTRACT)


solid = part.part
